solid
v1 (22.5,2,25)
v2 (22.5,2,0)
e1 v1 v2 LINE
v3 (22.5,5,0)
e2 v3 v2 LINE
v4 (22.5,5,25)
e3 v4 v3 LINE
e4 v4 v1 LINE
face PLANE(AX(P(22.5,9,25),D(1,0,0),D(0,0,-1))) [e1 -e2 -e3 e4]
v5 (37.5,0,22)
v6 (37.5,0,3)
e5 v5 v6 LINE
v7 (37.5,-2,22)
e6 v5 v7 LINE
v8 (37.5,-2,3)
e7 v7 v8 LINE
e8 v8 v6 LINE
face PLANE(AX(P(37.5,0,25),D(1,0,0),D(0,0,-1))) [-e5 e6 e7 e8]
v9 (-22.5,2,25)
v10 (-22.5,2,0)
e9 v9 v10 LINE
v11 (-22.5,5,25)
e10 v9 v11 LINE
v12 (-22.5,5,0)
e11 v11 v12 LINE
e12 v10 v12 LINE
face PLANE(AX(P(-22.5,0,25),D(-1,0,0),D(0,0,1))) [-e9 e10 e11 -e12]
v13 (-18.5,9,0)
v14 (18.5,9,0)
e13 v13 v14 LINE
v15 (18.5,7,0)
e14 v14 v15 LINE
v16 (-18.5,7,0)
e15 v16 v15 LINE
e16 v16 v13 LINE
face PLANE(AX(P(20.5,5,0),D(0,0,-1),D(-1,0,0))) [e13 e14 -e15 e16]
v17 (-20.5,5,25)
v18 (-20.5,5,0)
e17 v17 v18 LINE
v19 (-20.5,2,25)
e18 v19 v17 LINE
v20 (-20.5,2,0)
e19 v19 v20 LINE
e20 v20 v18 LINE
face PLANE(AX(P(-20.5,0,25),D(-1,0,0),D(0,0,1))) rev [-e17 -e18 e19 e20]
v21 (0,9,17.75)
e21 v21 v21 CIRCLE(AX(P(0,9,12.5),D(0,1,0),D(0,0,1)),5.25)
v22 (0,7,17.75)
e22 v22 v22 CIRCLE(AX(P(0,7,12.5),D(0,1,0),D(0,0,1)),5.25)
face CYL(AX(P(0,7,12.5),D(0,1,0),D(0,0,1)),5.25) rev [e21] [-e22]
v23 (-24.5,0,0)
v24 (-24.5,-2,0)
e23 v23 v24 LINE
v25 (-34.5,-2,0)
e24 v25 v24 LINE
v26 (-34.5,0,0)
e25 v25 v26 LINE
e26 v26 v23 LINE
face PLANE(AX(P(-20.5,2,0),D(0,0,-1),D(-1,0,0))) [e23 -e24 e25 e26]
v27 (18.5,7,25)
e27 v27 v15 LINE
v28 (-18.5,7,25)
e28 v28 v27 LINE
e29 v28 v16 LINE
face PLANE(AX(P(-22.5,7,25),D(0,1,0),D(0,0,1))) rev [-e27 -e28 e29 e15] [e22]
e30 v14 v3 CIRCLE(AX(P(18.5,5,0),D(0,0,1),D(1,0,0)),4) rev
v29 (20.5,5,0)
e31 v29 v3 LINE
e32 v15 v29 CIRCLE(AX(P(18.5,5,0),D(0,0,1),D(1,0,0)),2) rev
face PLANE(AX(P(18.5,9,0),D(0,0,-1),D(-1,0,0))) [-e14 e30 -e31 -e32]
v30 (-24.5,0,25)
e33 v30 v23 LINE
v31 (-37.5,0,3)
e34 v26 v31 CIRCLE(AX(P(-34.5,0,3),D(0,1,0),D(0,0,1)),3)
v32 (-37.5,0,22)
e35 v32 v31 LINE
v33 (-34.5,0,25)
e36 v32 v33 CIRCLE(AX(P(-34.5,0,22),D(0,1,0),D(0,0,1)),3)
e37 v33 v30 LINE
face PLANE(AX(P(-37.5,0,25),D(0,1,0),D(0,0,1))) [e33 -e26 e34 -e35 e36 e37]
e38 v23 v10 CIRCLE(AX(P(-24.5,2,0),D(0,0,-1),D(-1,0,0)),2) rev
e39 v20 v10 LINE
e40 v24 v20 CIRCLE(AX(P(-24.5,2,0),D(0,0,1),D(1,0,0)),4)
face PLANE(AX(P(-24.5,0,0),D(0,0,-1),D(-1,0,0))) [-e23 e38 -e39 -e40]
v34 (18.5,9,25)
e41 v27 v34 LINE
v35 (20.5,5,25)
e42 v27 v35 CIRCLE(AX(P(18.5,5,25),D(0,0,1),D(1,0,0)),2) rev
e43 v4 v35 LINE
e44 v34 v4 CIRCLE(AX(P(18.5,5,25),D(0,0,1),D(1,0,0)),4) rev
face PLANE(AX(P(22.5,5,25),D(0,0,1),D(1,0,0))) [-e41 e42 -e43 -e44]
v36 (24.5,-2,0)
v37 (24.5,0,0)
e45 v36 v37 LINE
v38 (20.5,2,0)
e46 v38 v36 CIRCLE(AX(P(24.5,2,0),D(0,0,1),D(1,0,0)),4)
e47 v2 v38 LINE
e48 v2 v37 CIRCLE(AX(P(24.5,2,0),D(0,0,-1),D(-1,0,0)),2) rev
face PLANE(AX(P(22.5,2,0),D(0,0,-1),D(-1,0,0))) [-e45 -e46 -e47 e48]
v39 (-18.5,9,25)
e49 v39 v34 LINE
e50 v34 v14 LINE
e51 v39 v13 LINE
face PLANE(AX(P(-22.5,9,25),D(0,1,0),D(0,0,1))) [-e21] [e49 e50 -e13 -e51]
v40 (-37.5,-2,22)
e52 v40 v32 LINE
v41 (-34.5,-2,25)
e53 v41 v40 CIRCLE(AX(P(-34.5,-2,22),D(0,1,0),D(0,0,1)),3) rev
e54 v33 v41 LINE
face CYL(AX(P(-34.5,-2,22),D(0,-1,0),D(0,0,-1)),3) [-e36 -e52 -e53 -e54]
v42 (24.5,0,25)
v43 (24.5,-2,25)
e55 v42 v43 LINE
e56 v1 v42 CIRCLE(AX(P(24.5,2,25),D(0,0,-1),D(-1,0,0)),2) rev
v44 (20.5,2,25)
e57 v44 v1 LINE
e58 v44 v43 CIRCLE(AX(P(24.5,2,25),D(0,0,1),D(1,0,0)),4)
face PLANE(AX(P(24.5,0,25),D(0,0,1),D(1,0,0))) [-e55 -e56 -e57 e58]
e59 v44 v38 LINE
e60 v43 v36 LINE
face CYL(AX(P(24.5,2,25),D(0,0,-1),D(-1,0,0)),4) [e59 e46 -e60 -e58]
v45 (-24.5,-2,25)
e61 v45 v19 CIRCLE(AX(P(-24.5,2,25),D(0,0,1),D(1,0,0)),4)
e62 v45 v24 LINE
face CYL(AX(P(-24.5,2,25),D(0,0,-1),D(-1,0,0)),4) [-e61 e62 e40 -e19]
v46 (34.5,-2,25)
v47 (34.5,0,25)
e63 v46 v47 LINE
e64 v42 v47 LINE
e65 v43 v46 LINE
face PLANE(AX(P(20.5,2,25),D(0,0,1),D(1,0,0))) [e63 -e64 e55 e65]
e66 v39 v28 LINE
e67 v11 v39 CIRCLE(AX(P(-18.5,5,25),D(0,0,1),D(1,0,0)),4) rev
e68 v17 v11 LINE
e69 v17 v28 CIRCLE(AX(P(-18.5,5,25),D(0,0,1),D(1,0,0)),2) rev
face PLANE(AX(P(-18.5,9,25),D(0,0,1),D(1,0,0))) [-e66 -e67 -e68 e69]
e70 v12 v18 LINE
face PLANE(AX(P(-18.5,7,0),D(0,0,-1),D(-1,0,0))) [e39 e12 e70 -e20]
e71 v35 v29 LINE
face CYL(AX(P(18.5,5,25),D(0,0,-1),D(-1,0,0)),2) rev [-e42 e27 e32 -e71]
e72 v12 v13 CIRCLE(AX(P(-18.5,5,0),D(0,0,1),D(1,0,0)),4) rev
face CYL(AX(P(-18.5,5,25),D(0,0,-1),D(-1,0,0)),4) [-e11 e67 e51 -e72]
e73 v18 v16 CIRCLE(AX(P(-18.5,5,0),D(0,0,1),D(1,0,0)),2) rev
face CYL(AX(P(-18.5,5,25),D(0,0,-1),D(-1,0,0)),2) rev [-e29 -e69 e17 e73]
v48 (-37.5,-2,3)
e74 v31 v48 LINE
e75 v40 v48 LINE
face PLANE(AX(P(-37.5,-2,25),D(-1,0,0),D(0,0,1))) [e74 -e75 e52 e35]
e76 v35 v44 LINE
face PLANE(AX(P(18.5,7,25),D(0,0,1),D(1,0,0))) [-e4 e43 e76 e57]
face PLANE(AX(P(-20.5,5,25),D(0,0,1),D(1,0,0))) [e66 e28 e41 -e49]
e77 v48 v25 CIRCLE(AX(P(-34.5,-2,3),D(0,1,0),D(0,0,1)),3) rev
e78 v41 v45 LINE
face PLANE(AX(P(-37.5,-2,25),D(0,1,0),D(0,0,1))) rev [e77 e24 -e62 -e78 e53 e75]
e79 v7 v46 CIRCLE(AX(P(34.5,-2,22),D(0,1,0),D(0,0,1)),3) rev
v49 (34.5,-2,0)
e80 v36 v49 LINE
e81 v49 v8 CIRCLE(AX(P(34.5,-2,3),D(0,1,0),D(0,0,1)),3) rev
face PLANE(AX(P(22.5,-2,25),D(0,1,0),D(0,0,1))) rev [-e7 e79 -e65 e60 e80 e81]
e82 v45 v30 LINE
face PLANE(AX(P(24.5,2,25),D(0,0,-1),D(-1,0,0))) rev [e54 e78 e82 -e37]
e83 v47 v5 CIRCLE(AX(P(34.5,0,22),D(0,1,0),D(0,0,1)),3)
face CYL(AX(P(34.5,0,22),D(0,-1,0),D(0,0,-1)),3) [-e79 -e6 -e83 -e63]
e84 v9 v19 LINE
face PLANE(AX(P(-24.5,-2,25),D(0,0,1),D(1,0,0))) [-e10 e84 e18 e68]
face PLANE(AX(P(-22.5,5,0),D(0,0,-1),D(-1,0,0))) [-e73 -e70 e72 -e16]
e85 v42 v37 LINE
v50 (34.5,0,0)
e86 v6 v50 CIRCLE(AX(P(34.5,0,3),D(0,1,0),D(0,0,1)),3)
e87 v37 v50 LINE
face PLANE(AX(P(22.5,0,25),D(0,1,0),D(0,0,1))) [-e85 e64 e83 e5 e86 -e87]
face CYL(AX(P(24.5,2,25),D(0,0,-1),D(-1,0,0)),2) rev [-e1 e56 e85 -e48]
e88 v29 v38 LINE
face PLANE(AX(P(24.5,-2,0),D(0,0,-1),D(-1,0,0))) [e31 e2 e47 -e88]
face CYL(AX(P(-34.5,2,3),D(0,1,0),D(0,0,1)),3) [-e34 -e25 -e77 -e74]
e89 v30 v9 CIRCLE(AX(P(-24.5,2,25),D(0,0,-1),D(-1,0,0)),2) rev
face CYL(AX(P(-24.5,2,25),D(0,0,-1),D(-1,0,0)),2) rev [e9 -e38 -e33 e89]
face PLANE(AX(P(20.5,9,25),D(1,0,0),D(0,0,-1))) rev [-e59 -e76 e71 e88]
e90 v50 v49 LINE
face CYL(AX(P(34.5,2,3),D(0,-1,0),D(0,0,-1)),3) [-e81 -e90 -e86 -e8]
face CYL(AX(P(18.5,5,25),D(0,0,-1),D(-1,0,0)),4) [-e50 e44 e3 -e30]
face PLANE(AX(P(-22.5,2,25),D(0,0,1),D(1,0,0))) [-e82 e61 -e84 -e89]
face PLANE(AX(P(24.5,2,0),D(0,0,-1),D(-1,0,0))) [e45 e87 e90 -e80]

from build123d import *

# Parameters (mm, degrees)
BASE_FLANGE1_DEPTH = 25
SKETCH7_R          = 5.25
CUT_EXTRUDE1_DEPTH = 10
FILLET1_R          = 3


# Sheet-metal steps are written as plain solids
with BuildPart() as part:
    # Sketch1 → Base-Flange1 (new body)
    with BuildSketch(Plane.XY):
        with BuildLine():
            Line((-37.5, 0), (-24.5, 0))
            ThreePointArc((-24.5, 0), (-23.085786438, 0.585786438), (-22.5, 2))
            Line((-22.5, 2), (-22.5, 5))
            ThreePointArc((-22.5, 5), (-21.328427125, 7.828427125), (-18.5, 9))
            Line((-18.5, 9), (18.5, 9))
            ThreePointArc((18.5, 9), (21.328427125, 7.828427125), (22.5, 5))
            Line((22.5, 5), (22.5, 2))
            ThreePointArc((22.5, 2), (23.085786438, 0.585786438), (24.5, 0))
            Line((24.5, 0), (37.5, 0))
            Line((37.5, 0), (37.5, -2))
            Line((37.5, -2), (24.5, -2))
            ThreePointArc((24.5, -2), (21.671572875, -0.828427125), (20.5, 2))
            Line((20.5, 2), (20.5, 5))
            ThreePointArc((20.5, 5), (19.914213562, 6.414213562), (18.5, 7))
            Line((18.5, 7), (-18.5, 7))
            ThreePointArc((-18.5, 7), (-19.914213562, 6.414213562), (-20.5, 5))
            Line((-20.5, 5), (-20.5, 2))
            ThreePointArc((-20.5, 2), (-21.671572875, -0.828427125), (-24.5, -2))
            Line((-24.5, -2), (-37.5, -2))
            Line((-37.5, -2), (-37.5, 0))
        make_face()
    extrude(amount=BASE_FLANGE1_DEPTH)

    # Sketch7 → Cut-Extrude1 (cut)
    with BuildSketch(Plane(origin=(0, 9, 0), x_dir=(1, 0, 0), z_dir=(0, 1, 0))):
        with Locations(Location((0, -12.5, 0), (0, 0, 270))):
            Circle(SKETCH7_R)
    extrude(amount=-CUT_EXTRUDE1_DEPTH, mode=Mode.SUBTRACT)

    # Fillet1
    fillet1_edges = [part.edges().sort_by_distance(p)[0] for p in [
        (-37.5, -1, 0),
        (37.5, -1, 0),
        (-37.5, -1, 25),
        (37.5, -1, 25),
    ]]
    fillet(fillet1_edges, radius=FILLET1_R)


solid = part.part
